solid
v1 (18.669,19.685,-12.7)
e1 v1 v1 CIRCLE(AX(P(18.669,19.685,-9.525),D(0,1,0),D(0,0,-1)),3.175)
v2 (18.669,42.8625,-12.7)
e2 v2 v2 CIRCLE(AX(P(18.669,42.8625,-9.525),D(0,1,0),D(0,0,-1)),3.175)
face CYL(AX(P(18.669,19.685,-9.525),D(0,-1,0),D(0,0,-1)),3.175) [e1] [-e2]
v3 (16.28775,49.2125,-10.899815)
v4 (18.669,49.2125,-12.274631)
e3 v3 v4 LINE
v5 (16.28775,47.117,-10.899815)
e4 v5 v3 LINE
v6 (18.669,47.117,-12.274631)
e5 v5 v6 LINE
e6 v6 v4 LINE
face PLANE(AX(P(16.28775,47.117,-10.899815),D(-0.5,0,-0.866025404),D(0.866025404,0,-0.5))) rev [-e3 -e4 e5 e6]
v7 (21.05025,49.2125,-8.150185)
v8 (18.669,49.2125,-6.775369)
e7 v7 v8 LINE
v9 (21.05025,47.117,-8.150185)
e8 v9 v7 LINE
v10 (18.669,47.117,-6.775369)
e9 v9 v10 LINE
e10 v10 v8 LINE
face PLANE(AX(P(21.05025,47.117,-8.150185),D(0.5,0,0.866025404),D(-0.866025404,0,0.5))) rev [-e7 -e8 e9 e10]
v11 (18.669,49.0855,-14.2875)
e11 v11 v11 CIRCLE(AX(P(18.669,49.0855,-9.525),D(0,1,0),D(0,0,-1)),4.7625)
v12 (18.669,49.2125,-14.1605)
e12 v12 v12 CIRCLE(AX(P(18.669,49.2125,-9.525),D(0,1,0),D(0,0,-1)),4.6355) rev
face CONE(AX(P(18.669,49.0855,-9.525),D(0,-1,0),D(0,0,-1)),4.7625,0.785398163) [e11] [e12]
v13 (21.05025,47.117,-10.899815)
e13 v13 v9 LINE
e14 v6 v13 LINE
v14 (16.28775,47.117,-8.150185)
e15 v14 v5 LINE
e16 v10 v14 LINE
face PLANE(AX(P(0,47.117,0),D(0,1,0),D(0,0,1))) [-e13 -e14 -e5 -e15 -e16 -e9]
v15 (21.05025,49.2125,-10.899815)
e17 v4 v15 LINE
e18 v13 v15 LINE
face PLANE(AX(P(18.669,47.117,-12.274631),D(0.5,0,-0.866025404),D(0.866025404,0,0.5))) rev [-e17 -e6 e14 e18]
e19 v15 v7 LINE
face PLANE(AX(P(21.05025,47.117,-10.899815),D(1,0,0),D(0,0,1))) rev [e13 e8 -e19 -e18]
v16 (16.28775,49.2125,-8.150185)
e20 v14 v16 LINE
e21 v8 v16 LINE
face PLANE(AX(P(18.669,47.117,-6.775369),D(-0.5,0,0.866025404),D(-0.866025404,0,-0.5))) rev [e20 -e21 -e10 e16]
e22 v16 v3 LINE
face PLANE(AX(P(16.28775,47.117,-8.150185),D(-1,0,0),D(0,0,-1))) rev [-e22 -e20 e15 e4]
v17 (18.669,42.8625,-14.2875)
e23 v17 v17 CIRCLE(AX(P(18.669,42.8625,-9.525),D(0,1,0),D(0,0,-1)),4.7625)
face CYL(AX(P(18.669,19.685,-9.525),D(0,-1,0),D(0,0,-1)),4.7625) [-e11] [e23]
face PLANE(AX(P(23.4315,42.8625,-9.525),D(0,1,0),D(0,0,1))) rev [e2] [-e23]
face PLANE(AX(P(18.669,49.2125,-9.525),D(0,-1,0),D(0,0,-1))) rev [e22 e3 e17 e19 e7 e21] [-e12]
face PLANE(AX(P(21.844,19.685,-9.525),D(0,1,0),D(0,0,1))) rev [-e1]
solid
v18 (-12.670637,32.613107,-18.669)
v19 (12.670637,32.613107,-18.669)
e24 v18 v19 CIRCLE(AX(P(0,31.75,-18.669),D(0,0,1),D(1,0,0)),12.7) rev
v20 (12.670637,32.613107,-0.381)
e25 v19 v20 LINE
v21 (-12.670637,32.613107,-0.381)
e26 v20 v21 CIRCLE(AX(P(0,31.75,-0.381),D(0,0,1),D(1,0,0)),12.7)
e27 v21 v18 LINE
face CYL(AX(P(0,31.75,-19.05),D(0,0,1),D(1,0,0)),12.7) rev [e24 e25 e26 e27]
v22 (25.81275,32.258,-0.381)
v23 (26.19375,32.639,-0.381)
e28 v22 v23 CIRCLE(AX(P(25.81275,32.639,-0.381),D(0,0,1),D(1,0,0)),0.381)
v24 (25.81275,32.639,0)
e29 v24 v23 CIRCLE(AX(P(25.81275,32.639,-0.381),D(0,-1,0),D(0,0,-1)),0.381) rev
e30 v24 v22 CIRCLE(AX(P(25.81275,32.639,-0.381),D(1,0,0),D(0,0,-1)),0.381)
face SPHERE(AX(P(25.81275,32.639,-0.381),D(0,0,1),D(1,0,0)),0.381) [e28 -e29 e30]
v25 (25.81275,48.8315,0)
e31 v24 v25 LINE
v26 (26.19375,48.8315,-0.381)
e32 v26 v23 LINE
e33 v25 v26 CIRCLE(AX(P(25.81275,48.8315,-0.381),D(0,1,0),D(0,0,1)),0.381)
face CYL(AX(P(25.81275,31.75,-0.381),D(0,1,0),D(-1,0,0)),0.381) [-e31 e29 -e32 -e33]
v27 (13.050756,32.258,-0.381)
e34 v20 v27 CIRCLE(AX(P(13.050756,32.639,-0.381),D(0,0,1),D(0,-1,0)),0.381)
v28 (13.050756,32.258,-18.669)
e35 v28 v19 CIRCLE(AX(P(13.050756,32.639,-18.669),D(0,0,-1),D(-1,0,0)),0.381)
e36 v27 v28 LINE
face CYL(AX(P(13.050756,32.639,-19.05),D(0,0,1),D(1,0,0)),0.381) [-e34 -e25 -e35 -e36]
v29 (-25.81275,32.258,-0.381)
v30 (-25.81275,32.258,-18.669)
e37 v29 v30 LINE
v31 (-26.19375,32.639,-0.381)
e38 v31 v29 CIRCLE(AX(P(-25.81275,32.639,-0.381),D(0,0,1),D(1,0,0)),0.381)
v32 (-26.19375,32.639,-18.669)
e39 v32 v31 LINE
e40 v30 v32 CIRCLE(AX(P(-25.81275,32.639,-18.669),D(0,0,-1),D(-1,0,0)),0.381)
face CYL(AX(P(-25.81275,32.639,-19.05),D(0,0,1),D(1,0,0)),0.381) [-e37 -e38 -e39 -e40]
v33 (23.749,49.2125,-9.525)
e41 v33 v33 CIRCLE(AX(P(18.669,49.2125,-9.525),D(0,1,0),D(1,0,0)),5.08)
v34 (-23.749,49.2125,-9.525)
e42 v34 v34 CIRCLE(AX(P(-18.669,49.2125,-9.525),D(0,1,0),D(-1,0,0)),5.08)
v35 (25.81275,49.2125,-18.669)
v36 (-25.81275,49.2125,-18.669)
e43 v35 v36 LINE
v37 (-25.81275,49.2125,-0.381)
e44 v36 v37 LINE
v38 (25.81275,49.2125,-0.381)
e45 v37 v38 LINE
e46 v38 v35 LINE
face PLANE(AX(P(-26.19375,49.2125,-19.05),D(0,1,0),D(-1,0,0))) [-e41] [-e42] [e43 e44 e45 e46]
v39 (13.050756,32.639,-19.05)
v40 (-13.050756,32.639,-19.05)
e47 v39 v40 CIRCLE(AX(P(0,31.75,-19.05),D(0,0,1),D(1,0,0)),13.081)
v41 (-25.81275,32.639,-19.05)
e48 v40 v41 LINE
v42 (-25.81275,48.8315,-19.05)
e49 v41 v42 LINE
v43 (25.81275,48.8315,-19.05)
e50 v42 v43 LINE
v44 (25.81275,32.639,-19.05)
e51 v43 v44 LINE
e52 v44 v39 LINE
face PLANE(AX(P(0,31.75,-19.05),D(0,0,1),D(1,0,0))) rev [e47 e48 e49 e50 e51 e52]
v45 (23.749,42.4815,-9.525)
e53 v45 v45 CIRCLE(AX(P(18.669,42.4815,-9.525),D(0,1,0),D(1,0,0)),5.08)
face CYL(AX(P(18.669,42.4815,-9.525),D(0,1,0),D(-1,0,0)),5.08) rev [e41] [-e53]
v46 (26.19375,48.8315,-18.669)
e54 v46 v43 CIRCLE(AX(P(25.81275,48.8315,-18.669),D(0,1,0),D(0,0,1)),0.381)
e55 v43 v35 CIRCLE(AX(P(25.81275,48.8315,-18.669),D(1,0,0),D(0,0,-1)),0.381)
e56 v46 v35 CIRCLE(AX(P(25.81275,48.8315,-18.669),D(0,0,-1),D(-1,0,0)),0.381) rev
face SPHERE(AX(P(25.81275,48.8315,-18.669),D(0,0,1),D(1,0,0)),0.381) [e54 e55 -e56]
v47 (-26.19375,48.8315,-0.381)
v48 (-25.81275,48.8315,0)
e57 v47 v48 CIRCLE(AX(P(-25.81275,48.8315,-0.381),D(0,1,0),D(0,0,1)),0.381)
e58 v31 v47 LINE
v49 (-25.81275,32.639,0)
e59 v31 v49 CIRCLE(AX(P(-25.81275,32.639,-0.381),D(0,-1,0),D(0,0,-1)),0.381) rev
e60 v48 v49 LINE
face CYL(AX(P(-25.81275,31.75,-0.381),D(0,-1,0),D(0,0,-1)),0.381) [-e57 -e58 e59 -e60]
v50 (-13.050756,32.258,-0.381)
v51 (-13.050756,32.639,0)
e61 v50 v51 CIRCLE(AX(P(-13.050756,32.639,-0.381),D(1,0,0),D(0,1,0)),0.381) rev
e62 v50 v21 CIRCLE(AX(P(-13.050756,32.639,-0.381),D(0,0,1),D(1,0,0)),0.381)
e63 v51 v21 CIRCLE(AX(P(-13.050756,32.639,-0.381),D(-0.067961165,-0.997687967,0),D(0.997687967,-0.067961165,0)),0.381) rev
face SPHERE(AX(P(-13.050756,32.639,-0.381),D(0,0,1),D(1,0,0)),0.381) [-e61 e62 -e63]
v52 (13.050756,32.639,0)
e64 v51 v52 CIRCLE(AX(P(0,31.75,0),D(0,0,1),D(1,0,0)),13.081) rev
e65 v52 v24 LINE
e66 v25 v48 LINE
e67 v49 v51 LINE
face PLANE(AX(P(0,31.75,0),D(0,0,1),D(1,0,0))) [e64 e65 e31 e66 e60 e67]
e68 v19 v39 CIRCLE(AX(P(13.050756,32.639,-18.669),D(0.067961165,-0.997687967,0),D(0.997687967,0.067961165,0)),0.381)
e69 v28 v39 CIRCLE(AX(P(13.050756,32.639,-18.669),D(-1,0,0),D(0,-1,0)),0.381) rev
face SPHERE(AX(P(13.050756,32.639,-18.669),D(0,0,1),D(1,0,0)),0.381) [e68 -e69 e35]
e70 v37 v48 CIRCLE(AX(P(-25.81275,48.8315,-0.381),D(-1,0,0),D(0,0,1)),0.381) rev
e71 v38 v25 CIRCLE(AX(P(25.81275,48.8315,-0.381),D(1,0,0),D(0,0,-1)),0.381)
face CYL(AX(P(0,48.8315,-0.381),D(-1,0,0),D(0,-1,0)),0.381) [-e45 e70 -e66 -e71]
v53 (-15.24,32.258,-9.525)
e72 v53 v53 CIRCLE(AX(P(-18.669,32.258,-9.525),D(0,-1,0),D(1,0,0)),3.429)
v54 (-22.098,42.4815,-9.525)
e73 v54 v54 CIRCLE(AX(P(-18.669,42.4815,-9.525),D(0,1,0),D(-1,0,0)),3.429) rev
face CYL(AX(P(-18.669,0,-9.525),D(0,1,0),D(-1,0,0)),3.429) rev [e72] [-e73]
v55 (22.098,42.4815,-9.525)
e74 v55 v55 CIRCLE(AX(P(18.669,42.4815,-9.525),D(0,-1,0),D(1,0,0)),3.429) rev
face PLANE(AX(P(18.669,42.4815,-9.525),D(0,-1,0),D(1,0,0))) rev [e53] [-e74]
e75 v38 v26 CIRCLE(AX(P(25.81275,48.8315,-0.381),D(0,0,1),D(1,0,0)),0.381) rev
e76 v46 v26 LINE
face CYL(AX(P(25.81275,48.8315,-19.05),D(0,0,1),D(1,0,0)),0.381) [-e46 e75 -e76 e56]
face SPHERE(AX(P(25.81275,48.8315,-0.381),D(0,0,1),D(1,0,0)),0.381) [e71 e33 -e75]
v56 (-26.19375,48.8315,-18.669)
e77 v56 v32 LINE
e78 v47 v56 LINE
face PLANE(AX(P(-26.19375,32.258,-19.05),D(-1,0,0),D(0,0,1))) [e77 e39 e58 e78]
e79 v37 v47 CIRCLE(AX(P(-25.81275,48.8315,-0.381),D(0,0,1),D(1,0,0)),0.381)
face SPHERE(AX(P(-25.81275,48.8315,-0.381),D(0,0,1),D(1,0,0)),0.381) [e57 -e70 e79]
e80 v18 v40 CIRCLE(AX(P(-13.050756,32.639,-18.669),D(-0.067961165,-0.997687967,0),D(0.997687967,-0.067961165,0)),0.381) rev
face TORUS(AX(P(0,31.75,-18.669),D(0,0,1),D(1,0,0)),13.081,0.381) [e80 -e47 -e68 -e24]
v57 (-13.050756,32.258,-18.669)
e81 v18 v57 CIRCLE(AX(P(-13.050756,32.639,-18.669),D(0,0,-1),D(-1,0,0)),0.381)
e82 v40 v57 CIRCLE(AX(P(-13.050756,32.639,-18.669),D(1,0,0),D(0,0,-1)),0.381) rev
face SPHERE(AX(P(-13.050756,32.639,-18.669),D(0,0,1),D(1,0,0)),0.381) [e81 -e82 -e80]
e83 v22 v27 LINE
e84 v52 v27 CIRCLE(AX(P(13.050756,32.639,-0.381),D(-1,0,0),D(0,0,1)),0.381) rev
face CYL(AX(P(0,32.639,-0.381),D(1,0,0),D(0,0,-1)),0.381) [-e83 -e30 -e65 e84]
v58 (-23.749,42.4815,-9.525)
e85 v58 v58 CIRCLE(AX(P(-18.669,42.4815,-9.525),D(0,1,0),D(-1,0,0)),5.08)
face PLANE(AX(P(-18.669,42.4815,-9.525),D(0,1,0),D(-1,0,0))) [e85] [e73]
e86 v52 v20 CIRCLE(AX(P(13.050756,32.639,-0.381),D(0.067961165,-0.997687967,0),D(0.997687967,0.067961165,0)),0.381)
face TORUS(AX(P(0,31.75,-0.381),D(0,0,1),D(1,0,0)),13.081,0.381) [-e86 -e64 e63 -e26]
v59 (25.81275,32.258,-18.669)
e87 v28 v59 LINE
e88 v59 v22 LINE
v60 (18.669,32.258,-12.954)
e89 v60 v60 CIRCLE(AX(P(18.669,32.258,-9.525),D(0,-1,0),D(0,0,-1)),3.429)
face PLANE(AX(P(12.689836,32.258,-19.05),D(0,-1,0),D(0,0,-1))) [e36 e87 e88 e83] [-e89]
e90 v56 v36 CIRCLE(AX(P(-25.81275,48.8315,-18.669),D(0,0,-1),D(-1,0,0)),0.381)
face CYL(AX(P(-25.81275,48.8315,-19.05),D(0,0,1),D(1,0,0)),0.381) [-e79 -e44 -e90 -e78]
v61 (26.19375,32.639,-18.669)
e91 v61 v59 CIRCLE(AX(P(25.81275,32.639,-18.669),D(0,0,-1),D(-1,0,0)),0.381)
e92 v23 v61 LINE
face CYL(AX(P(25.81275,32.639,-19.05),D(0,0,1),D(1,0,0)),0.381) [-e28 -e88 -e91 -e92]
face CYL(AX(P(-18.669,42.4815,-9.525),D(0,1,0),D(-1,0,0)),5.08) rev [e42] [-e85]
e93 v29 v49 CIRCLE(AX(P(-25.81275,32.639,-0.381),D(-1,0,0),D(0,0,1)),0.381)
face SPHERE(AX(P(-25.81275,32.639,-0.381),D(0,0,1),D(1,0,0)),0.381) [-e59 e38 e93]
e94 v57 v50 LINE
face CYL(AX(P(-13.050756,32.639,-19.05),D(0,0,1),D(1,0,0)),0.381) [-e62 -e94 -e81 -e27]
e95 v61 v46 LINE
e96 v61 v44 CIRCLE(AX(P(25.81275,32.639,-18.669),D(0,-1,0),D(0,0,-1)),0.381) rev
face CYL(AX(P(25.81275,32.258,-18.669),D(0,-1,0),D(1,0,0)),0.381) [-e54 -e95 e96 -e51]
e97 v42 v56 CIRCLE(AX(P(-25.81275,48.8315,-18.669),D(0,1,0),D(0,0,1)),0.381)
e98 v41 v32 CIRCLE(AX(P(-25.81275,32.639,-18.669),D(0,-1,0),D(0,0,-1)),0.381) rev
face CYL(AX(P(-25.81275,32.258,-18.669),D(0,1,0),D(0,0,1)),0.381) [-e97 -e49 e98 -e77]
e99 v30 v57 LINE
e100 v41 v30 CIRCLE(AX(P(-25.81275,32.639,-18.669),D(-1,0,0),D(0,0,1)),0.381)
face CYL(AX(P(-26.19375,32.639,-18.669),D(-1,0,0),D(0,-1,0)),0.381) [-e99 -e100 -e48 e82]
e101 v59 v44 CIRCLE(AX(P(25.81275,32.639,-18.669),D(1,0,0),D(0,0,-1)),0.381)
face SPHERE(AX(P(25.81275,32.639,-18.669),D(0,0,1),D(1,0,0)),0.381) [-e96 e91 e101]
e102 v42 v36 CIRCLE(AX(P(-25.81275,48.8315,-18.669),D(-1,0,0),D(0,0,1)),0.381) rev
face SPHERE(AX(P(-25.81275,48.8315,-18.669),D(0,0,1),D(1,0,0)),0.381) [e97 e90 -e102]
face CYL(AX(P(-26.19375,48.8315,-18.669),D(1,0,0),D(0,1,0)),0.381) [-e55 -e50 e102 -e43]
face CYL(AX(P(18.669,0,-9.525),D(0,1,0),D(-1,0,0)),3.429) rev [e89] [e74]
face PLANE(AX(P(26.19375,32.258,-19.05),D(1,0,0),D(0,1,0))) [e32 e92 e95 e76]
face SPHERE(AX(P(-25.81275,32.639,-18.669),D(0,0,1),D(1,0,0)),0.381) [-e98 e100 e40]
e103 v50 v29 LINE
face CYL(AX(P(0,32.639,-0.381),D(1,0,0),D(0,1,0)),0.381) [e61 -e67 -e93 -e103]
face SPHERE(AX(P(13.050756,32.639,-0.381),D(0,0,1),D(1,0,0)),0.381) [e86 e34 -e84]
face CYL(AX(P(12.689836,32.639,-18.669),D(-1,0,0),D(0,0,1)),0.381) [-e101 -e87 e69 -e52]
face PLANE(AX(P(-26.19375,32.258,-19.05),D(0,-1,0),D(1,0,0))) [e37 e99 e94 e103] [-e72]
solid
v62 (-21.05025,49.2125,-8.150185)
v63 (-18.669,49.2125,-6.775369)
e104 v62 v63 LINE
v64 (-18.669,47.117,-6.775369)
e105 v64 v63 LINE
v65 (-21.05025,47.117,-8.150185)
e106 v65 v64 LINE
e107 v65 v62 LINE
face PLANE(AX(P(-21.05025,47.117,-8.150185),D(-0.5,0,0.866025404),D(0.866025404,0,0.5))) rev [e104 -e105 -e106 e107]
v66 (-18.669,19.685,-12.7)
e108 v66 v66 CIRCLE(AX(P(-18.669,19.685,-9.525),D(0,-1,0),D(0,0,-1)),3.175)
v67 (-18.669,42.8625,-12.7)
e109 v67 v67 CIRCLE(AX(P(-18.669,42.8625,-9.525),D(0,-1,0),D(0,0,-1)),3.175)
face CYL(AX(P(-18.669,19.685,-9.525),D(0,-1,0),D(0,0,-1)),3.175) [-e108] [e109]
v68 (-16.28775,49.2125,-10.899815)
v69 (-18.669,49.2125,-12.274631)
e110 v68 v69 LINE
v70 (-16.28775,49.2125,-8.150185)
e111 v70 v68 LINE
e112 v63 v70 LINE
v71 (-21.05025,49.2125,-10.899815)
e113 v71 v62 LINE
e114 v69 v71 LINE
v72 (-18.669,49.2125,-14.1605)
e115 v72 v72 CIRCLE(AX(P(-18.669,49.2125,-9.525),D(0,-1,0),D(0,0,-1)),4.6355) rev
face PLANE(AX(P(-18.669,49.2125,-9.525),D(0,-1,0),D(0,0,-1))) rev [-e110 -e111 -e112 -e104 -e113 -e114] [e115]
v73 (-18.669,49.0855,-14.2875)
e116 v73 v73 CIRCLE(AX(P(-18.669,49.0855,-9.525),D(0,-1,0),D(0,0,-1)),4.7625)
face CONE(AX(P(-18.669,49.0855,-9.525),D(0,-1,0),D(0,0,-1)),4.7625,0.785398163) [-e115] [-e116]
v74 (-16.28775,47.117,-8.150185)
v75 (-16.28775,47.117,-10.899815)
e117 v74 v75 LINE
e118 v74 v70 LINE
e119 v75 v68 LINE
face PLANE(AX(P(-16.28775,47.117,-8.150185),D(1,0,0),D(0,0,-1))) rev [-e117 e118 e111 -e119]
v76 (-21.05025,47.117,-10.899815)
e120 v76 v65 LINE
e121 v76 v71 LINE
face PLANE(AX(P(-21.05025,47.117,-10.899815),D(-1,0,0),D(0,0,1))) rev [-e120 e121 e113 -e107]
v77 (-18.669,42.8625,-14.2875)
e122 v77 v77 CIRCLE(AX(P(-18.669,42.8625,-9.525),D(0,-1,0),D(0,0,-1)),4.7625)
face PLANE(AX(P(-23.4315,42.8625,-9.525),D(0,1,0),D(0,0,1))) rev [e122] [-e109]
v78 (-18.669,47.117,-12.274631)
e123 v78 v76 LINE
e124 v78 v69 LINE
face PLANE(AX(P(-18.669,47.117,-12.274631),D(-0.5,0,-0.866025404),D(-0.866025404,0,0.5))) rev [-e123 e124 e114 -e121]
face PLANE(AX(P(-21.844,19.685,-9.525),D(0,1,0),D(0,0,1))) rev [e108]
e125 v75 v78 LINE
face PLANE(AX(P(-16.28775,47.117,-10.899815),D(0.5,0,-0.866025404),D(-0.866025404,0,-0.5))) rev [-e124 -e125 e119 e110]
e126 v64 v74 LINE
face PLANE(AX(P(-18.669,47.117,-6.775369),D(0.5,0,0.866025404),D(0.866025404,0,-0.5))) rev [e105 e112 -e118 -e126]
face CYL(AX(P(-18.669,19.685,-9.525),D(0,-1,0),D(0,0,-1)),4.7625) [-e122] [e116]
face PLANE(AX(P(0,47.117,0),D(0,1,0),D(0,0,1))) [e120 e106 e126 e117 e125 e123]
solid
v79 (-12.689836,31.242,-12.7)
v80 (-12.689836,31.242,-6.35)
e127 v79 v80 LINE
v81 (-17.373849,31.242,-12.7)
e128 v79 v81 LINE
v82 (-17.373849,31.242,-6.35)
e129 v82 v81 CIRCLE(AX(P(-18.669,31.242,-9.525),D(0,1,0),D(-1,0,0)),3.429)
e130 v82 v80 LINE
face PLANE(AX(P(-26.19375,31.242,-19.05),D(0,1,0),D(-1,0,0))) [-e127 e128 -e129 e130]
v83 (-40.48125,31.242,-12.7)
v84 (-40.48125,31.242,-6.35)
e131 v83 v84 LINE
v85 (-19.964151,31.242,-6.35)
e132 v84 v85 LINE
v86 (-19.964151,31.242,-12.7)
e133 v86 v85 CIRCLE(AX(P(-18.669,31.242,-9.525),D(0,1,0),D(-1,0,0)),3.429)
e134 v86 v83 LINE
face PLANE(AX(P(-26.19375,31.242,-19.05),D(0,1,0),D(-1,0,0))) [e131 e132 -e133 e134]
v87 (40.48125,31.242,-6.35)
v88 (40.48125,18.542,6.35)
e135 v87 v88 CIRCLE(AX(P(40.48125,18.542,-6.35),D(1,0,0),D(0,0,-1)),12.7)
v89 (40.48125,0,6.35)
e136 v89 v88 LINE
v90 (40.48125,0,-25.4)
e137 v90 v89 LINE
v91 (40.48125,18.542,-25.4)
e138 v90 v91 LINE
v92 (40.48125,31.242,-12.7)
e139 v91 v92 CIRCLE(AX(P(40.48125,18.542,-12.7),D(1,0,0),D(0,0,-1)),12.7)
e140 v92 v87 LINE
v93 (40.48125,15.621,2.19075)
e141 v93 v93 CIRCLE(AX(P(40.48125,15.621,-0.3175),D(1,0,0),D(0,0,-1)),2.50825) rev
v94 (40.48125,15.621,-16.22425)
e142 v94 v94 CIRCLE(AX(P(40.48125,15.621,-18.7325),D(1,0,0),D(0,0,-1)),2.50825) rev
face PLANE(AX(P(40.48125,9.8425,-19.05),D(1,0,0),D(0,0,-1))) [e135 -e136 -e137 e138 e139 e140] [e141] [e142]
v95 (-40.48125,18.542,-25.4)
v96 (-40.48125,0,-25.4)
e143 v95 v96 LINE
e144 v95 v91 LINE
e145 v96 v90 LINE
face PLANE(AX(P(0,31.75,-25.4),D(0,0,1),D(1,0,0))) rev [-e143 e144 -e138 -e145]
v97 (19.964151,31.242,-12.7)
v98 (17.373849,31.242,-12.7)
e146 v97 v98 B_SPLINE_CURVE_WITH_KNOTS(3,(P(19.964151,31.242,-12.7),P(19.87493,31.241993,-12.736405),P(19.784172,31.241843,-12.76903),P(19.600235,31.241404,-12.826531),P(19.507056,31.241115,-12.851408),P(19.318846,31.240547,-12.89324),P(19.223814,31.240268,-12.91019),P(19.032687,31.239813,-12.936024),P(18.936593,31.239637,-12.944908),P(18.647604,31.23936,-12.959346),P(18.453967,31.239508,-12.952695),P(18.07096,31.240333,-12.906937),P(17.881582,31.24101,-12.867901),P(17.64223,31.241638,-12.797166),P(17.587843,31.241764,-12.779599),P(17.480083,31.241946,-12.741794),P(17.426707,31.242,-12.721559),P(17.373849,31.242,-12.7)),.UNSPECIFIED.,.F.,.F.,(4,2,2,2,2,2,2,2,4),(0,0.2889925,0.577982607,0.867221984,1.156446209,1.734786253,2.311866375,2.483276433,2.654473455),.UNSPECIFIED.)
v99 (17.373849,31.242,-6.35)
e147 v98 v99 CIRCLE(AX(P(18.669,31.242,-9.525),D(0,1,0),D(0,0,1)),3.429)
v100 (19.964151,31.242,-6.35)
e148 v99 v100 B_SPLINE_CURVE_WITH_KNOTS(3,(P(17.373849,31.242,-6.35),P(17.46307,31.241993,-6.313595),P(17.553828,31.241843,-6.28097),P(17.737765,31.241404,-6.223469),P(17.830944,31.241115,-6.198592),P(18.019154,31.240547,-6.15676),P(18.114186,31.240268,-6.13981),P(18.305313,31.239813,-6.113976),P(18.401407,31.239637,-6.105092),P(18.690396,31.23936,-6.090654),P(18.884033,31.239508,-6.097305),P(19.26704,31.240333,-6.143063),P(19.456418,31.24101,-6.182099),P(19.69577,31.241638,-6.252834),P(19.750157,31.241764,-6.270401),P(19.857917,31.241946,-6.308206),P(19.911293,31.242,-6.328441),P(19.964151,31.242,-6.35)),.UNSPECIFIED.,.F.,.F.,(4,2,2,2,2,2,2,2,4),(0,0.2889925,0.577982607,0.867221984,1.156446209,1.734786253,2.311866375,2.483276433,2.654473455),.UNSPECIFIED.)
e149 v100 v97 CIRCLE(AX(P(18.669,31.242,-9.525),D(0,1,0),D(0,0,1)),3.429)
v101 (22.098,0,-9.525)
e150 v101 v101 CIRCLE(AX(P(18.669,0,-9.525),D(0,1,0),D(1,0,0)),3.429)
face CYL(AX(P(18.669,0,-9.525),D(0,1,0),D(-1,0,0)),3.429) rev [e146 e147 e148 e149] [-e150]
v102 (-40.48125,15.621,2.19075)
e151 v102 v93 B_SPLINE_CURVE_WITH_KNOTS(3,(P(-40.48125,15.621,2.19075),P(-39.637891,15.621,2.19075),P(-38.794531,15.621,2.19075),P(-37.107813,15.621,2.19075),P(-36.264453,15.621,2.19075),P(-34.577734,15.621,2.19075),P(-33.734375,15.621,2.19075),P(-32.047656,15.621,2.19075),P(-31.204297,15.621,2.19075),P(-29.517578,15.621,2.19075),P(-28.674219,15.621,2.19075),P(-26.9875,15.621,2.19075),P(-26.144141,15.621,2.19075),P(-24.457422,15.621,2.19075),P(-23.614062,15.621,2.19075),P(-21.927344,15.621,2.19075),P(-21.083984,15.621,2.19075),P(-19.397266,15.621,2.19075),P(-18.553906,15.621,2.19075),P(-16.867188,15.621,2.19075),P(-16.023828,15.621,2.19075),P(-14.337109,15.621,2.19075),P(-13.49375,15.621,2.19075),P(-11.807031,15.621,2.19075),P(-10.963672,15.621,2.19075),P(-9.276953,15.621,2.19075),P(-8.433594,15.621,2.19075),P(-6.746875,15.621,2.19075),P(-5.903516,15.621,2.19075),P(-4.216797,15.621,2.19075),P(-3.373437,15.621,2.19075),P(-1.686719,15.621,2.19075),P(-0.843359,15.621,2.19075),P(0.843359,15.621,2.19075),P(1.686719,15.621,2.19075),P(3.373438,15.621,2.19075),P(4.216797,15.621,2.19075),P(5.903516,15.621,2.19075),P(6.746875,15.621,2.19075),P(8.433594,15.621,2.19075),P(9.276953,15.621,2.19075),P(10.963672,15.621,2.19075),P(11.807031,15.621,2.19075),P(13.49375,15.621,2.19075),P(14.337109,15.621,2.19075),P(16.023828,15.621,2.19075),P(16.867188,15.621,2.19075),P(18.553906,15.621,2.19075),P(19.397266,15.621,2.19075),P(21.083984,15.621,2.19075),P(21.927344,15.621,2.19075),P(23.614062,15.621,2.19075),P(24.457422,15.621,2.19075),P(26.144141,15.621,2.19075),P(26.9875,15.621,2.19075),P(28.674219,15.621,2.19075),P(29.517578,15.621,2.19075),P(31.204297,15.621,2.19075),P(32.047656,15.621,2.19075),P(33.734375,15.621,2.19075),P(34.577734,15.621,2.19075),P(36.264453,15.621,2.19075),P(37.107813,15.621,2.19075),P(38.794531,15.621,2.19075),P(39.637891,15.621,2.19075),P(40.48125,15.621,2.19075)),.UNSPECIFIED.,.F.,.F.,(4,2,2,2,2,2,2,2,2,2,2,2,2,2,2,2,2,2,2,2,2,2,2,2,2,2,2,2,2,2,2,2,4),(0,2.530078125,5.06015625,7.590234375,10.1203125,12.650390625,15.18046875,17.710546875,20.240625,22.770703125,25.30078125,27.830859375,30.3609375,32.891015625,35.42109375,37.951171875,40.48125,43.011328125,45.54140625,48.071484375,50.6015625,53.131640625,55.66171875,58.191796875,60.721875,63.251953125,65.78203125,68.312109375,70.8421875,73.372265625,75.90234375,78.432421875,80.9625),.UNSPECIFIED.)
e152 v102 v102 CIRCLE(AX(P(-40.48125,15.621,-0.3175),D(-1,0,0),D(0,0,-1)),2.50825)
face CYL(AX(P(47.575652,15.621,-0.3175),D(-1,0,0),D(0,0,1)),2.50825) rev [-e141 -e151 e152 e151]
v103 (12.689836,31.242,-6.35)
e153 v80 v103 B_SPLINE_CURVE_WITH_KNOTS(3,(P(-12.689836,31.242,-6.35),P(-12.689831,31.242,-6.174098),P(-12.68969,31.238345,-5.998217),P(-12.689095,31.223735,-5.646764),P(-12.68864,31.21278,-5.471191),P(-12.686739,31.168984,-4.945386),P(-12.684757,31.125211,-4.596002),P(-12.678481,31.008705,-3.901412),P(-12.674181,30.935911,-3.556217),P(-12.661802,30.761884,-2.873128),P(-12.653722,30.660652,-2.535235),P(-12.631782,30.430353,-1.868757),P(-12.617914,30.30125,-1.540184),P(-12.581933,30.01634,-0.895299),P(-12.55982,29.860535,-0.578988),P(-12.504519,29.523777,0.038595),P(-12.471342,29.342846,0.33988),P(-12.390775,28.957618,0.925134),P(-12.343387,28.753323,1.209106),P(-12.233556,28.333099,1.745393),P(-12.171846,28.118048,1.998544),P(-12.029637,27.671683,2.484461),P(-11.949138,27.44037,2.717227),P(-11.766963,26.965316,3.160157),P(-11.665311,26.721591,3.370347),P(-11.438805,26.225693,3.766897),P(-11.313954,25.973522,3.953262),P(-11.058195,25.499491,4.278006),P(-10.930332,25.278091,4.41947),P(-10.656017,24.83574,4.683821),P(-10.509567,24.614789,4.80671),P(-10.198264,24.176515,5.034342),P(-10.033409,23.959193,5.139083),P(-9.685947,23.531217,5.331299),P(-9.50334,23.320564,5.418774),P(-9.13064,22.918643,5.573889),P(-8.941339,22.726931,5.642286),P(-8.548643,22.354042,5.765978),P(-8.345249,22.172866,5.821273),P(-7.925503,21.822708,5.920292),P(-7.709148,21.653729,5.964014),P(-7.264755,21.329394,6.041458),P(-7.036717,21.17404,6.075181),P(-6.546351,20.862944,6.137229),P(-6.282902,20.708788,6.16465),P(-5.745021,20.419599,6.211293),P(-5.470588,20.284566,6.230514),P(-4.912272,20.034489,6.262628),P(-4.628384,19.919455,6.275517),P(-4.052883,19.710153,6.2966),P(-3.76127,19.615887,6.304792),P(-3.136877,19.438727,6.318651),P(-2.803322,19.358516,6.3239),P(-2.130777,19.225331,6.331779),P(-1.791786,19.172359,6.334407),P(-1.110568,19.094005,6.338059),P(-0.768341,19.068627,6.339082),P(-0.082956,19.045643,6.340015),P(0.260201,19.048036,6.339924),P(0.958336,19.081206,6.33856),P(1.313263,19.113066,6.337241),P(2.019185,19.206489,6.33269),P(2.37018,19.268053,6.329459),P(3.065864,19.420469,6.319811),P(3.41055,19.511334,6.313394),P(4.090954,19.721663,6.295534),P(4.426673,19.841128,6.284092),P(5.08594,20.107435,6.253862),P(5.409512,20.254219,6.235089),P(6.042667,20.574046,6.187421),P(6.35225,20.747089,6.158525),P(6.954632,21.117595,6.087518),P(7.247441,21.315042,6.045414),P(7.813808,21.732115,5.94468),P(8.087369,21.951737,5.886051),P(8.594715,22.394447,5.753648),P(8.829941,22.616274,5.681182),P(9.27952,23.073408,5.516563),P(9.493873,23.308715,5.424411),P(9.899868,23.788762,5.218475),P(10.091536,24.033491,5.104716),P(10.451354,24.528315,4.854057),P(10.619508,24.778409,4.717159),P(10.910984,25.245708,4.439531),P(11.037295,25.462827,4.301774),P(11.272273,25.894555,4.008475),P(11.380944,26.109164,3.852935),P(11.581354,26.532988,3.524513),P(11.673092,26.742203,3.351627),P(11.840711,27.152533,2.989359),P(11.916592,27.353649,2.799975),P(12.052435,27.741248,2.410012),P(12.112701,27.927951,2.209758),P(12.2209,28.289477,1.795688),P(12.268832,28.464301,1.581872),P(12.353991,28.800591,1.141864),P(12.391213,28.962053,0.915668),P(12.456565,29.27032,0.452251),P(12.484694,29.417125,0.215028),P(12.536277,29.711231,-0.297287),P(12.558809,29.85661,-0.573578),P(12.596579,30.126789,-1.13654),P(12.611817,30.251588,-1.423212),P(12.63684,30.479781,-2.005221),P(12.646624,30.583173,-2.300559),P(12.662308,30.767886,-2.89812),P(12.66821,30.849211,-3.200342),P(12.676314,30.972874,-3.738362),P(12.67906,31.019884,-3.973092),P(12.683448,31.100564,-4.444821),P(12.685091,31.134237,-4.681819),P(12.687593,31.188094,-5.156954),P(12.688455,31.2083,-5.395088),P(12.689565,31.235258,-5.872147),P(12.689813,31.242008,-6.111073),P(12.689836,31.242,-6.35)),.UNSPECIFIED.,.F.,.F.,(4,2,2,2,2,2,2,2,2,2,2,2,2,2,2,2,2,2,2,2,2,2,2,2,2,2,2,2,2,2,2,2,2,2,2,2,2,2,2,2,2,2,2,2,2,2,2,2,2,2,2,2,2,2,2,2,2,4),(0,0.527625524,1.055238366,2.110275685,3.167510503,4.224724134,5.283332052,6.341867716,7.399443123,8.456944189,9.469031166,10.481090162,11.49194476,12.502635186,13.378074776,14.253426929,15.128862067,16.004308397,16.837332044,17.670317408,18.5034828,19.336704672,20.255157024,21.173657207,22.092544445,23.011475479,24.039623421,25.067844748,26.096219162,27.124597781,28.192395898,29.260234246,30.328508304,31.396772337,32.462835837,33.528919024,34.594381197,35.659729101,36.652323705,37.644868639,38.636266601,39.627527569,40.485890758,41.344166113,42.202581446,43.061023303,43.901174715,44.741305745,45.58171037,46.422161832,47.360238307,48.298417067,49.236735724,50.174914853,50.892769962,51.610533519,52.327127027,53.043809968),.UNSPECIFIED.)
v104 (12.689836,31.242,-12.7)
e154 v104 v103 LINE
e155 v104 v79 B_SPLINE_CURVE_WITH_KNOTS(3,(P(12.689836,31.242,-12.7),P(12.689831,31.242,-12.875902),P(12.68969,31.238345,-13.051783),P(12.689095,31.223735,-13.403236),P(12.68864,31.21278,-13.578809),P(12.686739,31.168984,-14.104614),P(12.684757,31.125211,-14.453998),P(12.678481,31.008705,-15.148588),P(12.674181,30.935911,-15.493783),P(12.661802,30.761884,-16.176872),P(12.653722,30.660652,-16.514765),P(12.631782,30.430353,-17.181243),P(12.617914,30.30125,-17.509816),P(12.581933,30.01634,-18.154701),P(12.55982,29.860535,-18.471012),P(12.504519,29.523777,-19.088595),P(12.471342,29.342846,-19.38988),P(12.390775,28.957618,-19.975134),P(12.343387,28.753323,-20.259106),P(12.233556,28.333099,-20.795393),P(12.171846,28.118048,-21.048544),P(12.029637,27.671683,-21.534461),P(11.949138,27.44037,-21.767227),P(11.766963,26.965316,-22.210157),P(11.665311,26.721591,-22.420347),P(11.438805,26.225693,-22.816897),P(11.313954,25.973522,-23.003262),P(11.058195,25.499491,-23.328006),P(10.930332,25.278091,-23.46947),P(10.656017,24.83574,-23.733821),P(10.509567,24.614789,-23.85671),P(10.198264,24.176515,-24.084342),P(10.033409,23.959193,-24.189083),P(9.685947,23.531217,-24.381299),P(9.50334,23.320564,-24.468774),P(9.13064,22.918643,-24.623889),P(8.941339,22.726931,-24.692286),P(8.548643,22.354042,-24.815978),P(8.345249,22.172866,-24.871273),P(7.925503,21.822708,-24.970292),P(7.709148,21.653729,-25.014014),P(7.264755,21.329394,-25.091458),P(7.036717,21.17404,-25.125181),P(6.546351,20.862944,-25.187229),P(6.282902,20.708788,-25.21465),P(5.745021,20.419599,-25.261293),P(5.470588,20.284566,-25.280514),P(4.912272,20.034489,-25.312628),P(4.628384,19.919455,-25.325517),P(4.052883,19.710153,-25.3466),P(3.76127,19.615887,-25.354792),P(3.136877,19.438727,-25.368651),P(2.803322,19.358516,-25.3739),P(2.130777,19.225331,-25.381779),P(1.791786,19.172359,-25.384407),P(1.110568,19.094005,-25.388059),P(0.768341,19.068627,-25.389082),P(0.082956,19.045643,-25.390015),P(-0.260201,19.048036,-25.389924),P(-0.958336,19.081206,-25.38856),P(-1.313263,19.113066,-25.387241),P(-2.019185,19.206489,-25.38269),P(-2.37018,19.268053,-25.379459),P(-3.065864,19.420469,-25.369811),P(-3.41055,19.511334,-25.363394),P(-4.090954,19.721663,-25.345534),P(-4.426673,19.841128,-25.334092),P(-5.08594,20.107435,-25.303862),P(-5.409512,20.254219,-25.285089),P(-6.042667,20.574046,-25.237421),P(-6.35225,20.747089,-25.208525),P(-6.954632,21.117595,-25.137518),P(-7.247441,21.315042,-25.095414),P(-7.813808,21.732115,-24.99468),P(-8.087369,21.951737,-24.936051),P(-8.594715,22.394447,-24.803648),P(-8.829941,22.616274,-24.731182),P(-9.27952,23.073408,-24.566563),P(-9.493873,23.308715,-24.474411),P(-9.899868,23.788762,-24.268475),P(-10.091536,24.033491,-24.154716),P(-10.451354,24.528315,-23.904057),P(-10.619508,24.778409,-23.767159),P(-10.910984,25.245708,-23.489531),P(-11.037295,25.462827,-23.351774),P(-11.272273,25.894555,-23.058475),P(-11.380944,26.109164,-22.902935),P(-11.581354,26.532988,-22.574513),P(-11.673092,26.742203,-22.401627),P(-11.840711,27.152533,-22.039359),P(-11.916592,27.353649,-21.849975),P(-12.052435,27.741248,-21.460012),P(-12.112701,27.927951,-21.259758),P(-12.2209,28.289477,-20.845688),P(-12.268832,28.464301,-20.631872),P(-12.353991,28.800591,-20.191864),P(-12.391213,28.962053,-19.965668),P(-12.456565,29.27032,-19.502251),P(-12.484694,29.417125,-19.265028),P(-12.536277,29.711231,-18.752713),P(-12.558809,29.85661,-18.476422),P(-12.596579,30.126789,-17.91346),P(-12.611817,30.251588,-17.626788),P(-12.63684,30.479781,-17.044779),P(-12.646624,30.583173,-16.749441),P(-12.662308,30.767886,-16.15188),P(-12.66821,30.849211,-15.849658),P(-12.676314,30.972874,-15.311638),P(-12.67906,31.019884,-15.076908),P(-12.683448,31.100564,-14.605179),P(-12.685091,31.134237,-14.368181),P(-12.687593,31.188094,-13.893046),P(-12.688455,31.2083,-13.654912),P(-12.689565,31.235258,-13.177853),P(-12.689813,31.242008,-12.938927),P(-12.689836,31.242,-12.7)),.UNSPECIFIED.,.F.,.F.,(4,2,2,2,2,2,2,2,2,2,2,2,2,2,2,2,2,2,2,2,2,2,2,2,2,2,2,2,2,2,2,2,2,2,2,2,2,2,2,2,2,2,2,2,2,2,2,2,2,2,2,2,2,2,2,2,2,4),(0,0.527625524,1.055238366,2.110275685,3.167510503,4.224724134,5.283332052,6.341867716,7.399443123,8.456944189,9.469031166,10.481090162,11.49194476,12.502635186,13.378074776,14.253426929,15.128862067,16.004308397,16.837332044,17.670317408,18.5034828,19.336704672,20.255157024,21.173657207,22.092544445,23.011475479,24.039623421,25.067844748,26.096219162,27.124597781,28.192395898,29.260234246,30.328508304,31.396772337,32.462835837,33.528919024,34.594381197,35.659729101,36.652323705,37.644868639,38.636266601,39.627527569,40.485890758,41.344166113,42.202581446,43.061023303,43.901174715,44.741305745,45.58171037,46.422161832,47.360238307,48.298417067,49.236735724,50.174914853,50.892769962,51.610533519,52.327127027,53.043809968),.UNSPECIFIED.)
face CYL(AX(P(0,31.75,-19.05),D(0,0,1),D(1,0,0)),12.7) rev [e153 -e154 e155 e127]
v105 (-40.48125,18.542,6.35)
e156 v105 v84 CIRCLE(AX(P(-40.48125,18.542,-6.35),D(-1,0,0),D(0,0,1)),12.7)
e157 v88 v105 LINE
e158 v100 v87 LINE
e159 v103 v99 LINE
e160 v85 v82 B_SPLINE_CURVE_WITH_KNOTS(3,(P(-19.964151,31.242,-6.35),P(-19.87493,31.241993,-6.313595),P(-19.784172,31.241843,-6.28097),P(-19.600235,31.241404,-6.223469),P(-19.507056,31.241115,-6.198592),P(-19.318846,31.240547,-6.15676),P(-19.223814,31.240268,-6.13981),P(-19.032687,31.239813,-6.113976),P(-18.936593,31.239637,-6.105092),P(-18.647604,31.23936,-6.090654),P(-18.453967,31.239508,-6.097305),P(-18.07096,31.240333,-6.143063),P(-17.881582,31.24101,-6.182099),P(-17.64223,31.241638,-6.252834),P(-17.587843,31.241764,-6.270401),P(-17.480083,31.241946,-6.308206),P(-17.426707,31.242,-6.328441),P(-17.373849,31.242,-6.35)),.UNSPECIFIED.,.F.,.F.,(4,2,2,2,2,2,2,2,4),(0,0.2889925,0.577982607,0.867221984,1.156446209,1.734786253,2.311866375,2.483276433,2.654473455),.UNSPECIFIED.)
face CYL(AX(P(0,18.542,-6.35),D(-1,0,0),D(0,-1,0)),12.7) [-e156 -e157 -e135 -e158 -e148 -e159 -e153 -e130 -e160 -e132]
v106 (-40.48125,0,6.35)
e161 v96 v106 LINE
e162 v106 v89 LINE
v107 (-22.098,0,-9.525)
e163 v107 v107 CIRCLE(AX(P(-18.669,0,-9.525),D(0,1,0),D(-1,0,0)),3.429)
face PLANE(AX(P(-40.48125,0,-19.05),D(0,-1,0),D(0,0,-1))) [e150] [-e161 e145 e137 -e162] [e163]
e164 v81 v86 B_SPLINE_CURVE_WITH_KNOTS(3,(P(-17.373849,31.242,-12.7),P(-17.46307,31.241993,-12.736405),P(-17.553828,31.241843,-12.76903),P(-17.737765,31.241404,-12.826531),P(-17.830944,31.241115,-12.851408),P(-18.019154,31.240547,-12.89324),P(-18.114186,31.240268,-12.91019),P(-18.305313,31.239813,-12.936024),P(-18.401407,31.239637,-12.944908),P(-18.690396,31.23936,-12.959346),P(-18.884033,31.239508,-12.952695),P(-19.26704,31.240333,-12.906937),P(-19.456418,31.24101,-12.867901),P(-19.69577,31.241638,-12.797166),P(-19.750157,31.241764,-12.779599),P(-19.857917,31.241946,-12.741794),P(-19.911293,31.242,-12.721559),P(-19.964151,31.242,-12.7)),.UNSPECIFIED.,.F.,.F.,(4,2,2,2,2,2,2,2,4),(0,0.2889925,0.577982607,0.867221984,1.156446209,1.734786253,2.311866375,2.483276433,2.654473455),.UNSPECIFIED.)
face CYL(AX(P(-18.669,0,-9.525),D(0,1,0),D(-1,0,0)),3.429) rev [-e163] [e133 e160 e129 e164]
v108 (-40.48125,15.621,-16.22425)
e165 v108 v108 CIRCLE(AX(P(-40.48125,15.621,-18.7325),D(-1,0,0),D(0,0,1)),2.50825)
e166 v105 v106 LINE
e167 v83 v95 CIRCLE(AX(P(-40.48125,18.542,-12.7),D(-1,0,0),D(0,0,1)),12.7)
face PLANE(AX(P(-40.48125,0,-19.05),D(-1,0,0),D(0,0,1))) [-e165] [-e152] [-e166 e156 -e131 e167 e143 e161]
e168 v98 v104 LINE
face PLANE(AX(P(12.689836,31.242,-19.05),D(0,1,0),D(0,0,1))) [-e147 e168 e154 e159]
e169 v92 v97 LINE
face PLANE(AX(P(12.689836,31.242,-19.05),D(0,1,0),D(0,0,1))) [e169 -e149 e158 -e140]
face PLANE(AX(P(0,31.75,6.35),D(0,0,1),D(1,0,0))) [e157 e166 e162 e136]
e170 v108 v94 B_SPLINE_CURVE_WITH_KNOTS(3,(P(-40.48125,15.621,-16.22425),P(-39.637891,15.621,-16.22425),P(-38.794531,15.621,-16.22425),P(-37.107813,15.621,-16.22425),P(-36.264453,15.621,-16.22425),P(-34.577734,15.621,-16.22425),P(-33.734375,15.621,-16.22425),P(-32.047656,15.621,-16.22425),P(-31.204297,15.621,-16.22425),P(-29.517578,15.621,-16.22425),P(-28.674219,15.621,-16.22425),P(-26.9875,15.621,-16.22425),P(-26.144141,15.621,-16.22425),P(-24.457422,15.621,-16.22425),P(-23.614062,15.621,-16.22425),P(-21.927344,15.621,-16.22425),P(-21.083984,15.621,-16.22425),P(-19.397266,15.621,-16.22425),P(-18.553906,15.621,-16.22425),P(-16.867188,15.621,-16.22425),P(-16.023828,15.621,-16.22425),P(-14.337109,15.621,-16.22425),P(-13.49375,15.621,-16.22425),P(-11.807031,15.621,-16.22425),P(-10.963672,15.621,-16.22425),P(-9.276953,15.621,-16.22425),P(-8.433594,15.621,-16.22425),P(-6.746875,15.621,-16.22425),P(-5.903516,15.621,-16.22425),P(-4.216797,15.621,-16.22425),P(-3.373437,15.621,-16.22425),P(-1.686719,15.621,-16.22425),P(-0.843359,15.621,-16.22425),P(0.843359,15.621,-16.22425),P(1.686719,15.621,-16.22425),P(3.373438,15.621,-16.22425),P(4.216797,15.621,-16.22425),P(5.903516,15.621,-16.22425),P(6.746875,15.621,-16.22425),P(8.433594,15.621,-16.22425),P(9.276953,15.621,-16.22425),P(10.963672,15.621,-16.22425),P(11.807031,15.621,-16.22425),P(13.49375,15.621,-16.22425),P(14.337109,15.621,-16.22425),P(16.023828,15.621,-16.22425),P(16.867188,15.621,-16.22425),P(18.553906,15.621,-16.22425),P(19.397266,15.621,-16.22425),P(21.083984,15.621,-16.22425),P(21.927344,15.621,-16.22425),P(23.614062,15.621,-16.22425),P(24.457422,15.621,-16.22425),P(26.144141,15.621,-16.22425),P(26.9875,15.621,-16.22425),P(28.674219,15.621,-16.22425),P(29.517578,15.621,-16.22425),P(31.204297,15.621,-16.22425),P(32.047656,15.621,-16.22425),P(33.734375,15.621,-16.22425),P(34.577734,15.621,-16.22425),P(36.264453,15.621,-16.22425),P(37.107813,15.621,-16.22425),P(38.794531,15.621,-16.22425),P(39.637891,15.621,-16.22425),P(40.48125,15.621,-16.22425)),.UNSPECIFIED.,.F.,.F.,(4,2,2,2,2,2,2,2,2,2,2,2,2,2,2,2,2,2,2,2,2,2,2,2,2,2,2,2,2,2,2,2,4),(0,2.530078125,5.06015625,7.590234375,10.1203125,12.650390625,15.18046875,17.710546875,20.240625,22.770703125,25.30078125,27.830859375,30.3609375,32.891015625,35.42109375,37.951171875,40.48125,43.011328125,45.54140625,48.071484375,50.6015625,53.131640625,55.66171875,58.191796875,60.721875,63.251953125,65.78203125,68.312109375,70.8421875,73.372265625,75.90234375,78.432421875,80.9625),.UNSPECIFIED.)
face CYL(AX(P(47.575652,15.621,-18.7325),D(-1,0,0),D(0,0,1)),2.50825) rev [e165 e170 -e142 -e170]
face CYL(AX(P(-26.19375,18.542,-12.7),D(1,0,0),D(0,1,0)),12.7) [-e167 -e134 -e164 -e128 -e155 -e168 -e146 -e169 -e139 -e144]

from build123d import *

# Parameters (mm, degrees)
BOSS_EXTRUDE1_DEPTH   = 19.05
BOSS_EXTRUDE1_2_DEPTH = 19.05
SKETCH10_R            = 3.429
CUT_EXTRUDE4_DEPTH    = 67.509429841
SKETCH12_R            = 5.08
CUT_EXTRUDE5_DEPTH    = 6.731
CHAMFER1_SIZE         = 0.127
CUT_EXTRUDE6_DEPTH    = 2.0955
FILLET1_R             = 0.381
BOSS_EXTRUDE2_START   = 6.35
BOSS_EXTRUDE2_DEPTH   = 6.35
BOSS_EXTRUDE3_START   = -19.05
BOSS_EXTRUDE3_DEPTH   = 6.35
SKETCH18_R            = 2.50825
CUT_EXTRUDE7_DEPTH    = 80.9625
FILLET2_R             = 12.7


with BuildPart() as part:
    # Sketch3 → Boss-Extrude1 (new body)
    with BuildSketch(Plane.XY):
        with BuildLine():
            Line((-26.19375, 49.2125), (26.19375, 49.2125))
            Line((26.19375, 49.2125), (26.19375, 32.258))
            Line((26.19375, 32.258), (12.689835933, 32.258))
            ThreePointArc((12.689835933, 32.258), (0, 44.45), (-12.689835933, 32.258))
            Line((-12.689835933, 32.258), (-26.19375, 32.258))
            Line((-26.19375, 32.258), (-26.19375, 49.2125))
        make_face()
    extrude(amount=-BOSS_EXTRUDE1_DEPTH)


with BuildPart() as body_2:
    # Sketch3 → Boss-Extrude1 2 (new body)
    with BuildSketch(Plane.XY):
        with BuildLine():
            Line((-40.48125, 0), (-40.48125, 9.8425))
            Line((-40.48125, 9.8425), (-40.48125, 31.242))
            Line((-40.48125, 31.242), (-26.19375, 31.242))
            Line((-26.19375, 31.242), (-12.689835933, 31.242))
            ThreePointArc((-12.689835933, 31.242), (0, 19.05), (12.689835933, 31.242))
            Line((12.689835933, 31.242), (26.19375, 31.242))
            Line((26.19375, 31.242), (40.48125, 31.242))
            Line((40.48125, 31.242), (40.48125, 9.8425))
            Line((40.48125, 9.8425), (40.48125, 0))
            Line((40.48125, 0), (-40.48125, 0))
        make_face()
    extrude(amount=-BOSS_EXTRUDE1_2_DEPTH)


with BuildPart() as cut_extrude4_tool:
    # Sketch10 → Cut-Extrude4 (new, through all)
    with BuildSketch(Plane(origin=(0, 49.2125, 0), x_dir=(1, 0, 0), z_dir=(0, 1, 0))):
        with Locations(Location((18.669, 9.525, 0), (0, 0, 270))):
            Circle(SKETCH10_R)
        with Locations(Location((-18.669, 9.525, 0), (0, 0, 180))):
            Circle(SKETCH10_R)
    extrude(amount=-CUT_EXTRUDE4_DEPTH)


with BuildPart() as part_1:
    add(part.part)

    # Cut-Extrude4: cut by cut_extrude4_tool
    add(cut_extrude4_tool.part, mode=Mode.SUBTRACT)

    # Sketch12 → Cut-Extrude5 (cut)
    with BuildSketch(Plane(origin=(0, 49.2125, 0), x_dir=(1, 0, 0), z_dir=(0, 1, 0))):
        with Locations((18.669, 9.525)):
            Circle(SKETCH12_R)
        with Locations(Location((-18.669, 9.525, 0), (0, 0, 180))):
            Circle(SKETCH12_R)
    extrude(amount=-CUT_EXTRUDE5_DEPTH, mode=Mode.SUBTRACT)

    # Fillet1
    fillet1_edges = [part_1.edges().sort_by_distance(p)[0] for p in [
        (0, 44.45, -19.05),
        (-26.19375, 49.2125, -9.525),
        (26.19375, 49.2125, -9.525),
        (26.19375, 32.258, -9.525),
        (12.689835933, 32.258, -9.525),
        (-12.689835933, 32.258, -9.525),
        (-26.19375, 32.258, -9.525),
        (19.441792966, 32.258, -19.05),
        (26.19375, 40.73525, -19.05),
        (0, 49.2125, -19.05),
        (-26.19375, 40.73525, -19.05),
        (0, 49.2125, 0),
        (26.19375, 40.73525, 0),
        (19.441792966, 32.258, 0),
        (-19.441792966, 32.258, -19.05),
        (0, 44.45, 0),
        (-19.441792966, 32.258, 0),
        (-26.19375, 40.73525, 0),
    ]]
    fillet(fillet1_edges, radius=FILLET1_R)


with BuildPart() as body_2_1:
    add(body_2.part)

    # Cut-Extrude4: cut by cut_extrude4_tool
    add(cut_extrude4_tool.part, mode=Mode.SUBTRACT)

    # Sketch17 → Boss-Extrude2 (add)
    with BuildSketch(Plane.XY.offset(BOSS_EXTRUDE2_START)):
        with BuildLine():
            Line((-12.689835933, 31.242), (-40.48125, 31.242))
            Line((-40.48125, 31.242), (-40.48125, 0))
            Line((-40.48125, 0), (40.48125, 0))
            Line((40.48125, 0), (40.48125, 31.242))
            Line((40.48125, 31.242), (12.689835933, 31.242))
            ThreePointArc((12.689835933, 31.242), (0, 19.05), (-12.689835933, 31.242))
        make_face()
    extrude(amount=-BOSS_EXTRUDE2_DEPTH)

    # Sketch17<2> → Boss-Extrude3 (add)
    with BuildSketch(Plane.XY.offset(BOSS_EXTRUDE3_START)):
        with BuildLine():
            Line((-12.689835933, 31.242), (-40.48125, 31.242))
            Line((-40.48125, 31.242), (-40.48125, 0))
            Line((-40.48125, 0), (40.48125, 0))
            Line((40.48125, 0), (40.48125, 31.242))
            Line((40.48125, 31.242), (12.689835933, 31.242))
            ThreePointArc((12.689835933, 31.242), (0, 19.05), (-12.689835933, 31.242))
        make_face()
    extrude(amount=-BOSS_EXTRUDE3_DEPTH)

    # Sketch18 → Cut-Extrude7 (cut)
    with BuildSketch(Plane.ZY.offset(40.48125)):
        with Locations((-18.7325, 15.621)):
            Circle(SKETCH18_R)
        with Locations((-0.3175, 15.621)):
            Circle(SKETCH18_R)
    extrude(amount=-CUT_EXTRUDE7_DEPTH, mode=Mode.SUBTRACT)

    # Fillet2
    # the kernel refuses this fillet: 12.7 mm, written as the material it takes off along each edge
    with BuildSketch(Plane(origin=(19.060164067, 31.242, 6.35), x_dir=(0, -1, 0), z_dir=(-1, 0, 0)), Plane(origin=(72.23125, 31.242, 6.35), x_dir=(0, -1, 0), z_dir=(-1, 0, 0))) as fillet2_piece_1:
        with BuildLine():
            CenterArc((FILLET2_R, -FILLET2_R), FILLET2_R, 90, 90)
            Line((0, -FILLET2_R), (0, 0))
            Line((0, 0), (FILLET2_R, 0))
        make_face()
    extrude(amount=91.291414067, mode=Mode.SUBTRACT)
    with BuildSketch(Plane(origin=(72.23125, 31.242, -25.4), x_dir=(0, -1, 0), z_dir=(-1, 0, 0)), Plane(origin=(19.060164067, 31.242, -25.4), x_dir=(0, -1, 0), z_dir=(-1, 0, 0))) as fillet2_piece_2:
        with BuildLine():
            CenterArc((FILLET2_R, FILLET2_R), FILLET2_R, 180, 90)
            Line((0, FILLET2_R), (0, 0))
            Line((0, 0), (FILLET2_R, 0))
        make_face()
    extrude(amount=91.291414067, mode=Mode.SUBTRACT)


with BuildPart() as body_3:
    # Sketch15 → Revolve1 (revolve)
    with BuildSketch(Plane.XY.offset(-9.525), mode=Mode.PRIVATE) as revolve1_sk:
        Polygon((-18.669, 19.685), (-18.669, 49.2125), (-23.4315, 49.2125), (-23.4315, 42.8625), (-21.844, 42.8625), (-21.844, 19.685), align=None)
    revolve(revolve1_sk.sketch.rotate(Axis((-18.669, 19.685, -9.525), (0, 1, 0)), 270), axis=Axis((-18.669, 19.685, -9.525), (0, 1, 0)))

    # Chamfer1
    chamfer1_edges = [body_3.edges().sort_by_distance(p)[0] for p in [
        (-18.669, 49.2125, -4.7625),
    ]]
    chamfer(chamfer1_edges, length=CHAMFER1_SIZE)

    # Sketch16 → Cut-Extrude6 (cut)
    with BuildSketch(Plane(origin=(0, 49.2125, 0), x_dir=(1, 0, 0), z_dir=(0, 1, 0))):
        Polygon((-18.669, 12.274630657), (-21.05025, 10.899815329), (-21.05025, 8.150184671), (-18.669, 6.775369343), (-16.28775, 8.150184671), (-16.28775, 10.899815329), align=None)
    extrude(amount=-CUT_EXTRUDE6_DEPTH, mode=Mode.SUBTRACT)


with BuildPart() as body_4:
    # Mirror1: mirrored copy
    add(body_3.part.mirror(Plane(origin=(0, 0, 0), x_dir=(0, 0, 1), z_dir=(1, 0, 0))))


solid = Compound([part_1.part, body_2_1.part, body_3.part, body_4.part])
